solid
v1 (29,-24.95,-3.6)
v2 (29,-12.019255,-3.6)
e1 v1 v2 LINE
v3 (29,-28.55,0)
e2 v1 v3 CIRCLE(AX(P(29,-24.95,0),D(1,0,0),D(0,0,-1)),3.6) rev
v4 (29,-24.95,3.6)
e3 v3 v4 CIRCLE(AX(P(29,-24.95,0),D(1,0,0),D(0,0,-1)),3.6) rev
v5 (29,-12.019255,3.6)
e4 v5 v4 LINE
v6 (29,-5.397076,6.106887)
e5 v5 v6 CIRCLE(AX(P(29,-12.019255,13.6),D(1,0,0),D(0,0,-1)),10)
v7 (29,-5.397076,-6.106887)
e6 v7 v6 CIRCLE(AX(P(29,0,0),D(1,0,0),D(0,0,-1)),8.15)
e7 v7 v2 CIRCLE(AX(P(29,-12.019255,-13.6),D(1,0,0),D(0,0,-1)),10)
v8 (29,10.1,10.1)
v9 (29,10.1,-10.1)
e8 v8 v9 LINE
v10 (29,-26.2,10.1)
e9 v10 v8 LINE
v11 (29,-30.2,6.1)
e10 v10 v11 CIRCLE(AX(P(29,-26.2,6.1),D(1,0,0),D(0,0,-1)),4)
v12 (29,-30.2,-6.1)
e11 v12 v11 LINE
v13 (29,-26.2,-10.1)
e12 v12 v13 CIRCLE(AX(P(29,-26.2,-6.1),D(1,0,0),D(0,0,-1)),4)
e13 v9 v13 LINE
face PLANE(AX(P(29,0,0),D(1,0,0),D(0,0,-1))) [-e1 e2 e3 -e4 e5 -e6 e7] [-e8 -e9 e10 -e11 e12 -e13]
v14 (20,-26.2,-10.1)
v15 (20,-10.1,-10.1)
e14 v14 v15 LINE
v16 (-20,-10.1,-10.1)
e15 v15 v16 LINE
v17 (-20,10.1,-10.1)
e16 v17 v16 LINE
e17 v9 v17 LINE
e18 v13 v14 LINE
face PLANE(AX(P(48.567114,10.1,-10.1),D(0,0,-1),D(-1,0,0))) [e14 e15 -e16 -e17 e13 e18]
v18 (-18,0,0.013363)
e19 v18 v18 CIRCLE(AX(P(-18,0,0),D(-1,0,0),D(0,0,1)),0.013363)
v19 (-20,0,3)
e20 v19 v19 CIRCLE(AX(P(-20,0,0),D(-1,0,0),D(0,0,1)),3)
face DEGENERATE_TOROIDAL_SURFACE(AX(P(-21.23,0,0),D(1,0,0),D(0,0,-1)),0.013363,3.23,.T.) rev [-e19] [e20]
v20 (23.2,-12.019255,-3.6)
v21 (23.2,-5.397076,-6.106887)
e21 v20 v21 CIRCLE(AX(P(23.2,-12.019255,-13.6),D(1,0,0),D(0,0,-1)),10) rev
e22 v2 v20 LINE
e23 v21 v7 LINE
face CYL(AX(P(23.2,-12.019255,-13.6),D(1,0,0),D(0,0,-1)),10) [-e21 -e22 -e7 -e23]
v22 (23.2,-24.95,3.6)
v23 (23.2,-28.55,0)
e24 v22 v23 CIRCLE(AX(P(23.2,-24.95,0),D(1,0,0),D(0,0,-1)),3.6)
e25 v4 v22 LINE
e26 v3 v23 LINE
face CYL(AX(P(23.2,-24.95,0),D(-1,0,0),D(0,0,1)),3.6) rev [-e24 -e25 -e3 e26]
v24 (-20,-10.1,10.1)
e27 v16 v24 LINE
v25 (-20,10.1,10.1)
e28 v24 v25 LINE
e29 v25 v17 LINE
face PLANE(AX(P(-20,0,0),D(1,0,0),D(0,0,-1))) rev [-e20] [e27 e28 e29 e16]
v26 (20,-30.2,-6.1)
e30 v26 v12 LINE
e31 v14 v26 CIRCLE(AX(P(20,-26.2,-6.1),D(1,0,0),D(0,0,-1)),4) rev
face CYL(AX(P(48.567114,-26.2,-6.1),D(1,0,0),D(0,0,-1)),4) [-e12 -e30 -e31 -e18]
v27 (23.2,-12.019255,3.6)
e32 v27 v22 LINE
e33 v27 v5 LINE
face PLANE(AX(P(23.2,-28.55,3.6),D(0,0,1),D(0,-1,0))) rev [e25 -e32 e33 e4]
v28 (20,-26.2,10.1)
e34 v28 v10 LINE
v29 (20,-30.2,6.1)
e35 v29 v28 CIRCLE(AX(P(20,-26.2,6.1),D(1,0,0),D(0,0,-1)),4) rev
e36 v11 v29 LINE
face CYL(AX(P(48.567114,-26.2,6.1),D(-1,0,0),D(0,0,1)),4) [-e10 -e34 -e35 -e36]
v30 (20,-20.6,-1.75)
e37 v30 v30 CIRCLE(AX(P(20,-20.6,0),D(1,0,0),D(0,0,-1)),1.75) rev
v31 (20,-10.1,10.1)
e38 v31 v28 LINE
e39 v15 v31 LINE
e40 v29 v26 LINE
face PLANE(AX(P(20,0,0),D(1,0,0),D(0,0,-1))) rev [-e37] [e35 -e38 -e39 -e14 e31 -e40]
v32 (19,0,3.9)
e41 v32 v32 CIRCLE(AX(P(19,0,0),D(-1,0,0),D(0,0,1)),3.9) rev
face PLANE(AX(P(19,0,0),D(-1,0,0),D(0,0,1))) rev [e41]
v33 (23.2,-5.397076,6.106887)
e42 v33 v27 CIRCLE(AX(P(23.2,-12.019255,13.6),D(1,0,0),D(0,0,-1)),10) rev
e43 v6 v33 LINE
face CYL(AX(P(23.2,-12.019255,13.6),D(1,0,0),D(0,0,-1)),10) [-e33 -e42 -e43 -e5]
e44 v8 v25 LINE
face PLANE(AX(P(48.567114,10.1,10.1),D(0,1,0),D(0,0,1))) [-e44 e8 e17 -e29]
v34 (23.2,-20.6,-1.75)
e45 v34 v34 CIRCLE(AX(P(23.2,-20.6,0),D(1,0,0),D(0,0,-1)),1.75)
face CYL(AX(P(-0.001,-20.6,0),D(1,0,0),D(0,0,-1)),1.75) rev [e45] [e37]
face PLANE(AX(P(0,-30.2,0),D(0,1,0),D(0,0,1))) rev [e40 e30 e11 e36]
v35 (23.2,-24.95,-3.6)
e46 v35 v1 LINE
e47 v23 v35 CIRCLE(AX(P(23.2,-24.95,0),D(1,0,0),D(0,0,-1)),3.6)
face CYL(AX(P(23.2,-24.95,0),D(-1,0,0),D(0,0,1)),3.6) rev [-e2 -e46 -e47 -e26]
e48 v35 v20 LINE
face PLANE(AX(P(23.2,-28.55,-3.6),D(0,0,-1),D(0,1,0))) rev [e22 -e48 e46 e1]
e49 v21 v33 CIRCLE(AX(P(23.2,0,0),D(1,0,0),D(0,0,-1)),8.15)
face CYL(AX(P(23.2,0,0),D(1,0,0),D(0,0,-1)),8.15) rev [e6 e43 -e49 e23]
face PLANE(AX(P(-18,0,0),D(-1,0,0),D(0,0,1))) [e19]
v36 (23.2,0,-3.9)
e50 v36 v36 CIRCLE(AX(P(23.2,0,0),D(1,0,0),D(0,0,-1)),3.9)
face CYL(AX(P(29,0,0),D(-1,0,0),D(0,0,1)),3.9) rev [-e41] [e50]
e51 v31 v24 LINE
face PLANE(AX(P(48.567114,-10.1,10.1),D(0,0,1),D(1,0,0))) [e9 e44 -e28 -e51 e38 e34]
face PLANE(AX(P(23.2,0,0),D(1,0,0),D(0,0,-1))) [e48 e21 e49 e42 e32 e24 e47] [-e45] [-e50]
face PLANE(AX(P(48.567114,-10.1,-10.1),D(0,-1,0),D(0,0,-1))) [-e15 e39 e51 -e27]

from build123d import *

# Parameters (mm, degrees)
SKETCH1_W           = 20
SKETCH1_H           = 20
BOSS_EXTRUDE1_DEPTH = 20
SKETCH2_W           = 45
SKETCH2_H           = 70
BOSS_EXTRUDE2_DEPTH = 9
CUT_EXTRUDE1_DEPTH  = 5.8
FILLET1_R           = 3.6
FILLET2_R           = 10
SKETCH5_R           = 3.9
CUT_EXTRUDE2_DEPTH  = 51.717354032
CUT_EXTRUDE3_REACH  = 49.639
SKETCH6_R           = 1.75
SKETCH7_W           = 9
SKETCH7_H           = 45
CUT_EXTRUDE4_DEPTH  = 4.8
SKETCH9_W           = 9
SKETCH9_H           = 45
CUT_EXTRUDE5_DEPTH  = 23.8
SKETCH10_W          = 12.5
SKETCH10_H          = 41.4
CUT_EXTRUDE6_DEPTH  = 23.8
SKETCH11_W          = 20
SKETCH11_H          = 1.2
CUT_EXTRUDE7_DEPTH  = 23.8
BOSS_EXTRUDE3_START = 20
SKETCH12_W          = 20
SKETCH12_H          = 20
SKETCH12_R          = 3.9
BOSS_EXTRUDE3_DEPTH = 20
SKETCH13_W          = 20.2
SKETCH13_H          = 20.2
SKETCH13_R          = 3.9
BOSS_EXTRUDE4_DEPTH = 40
SKETCH14_W          = 9
SKETCH14_H          = 20
BOSS_EXTRUDE5_DEPTH = 0.1
SKETCH15_W          = 9
SKETCH15_H          = 40.3
BOSS_EXTRUDE6_DEPTH = 0.1
SKETCH16_W          = 9
SKETCH16_H          = 40.3
BOSS_EXTRUDE7_DEPTH = 0.1
SKETCH17_R          = 4.83091966
BOSS_EXTRUDE8_DEPTH = 39
SKETCH18_R          = 3
CUT_EXTRUDE8_DEPTH  = 2
FILLET3_R           = 3.23
FILLET4_R           = 4


# Some blends are built 0.0001 mm under size
with BuildPart() as part:
    # Sketch1 → Boss-Extrude1 (new body)
    with BuildSketch(Plane(origin=(0, 0, 0), x_dir=(0, 0, -1), z_dir=(1, 0, 0))):
        Rectangle(SKETCH1_W, SKETCH1_H)
    extrude(amount=BOSS_EXTRUDE1_DEPTH)

    # Sketch2 → Boss-Extrude2 (add)
    with BuildSketch(Plane(origin=(20, 0, 0), x_dir=(0, 0, -1), z_dir=(1, 0, 0))):
        Rectangle(SKETCH2_W, SKETCH2_H)
    extrude(amount=BOSS_EXTRUDE2_DEPTH)

    # Sketch4 → Cut-Extrude1 (cut)
    with BuildSketch(Plane(origin=(29, 0, 0), x_dir=(0, 0, -1), z_dir=(1, 0, 0))):
        with BuildLine():
            Line((3.6, -28.55), (-3.6, -28.55))
            Line((-3.6, -28.55), (-3.6, -7.311805523))
            ThreePointArc((-3.6, -7.311805523), (0, 8.15), (3.6, -7.311805523))
            Line((3.6, -7.311805523), (3.6, -28.55))
        make_face()
    extrude(amount=-CUT_EXTRUDE1_DEPTH, mode=Mode.SUBTRACT)

    # Fillet1
    fillet1_edges = [part.edges().sort_by_distance(p)[0] for p in [
        (26.1, -28.55, 3.6),
        (26.1, -28.55, -3.6),
    ]]
    fillet(fillet1_edges, radius=FILLET1_R - 0.0001)  # a hair under: the kernel refuses the full size

    # Fillet2
    fillet2_edges = [part.edges().sort_by_distance(p)[0] for p in [
        (26.1, -7.311805523, 3.6),
        (26.1, -7.311805523, -3.6),
    ]]
    fillet(fillet2_edges, radius=FILLET2_R)

    # Sketch5 → Cut-Extrude2 (cut, through all)
    with BuildSketch(Plane.ZY):
        Circle(SKETCH5_R)
    extrude(amount=-CUT_EXTRUDE2_DEPTH, mode=Mode.SUBTRACT)

    # Sketch6 → Cut-Extrude3 (cut, up to next)
    with BuildSketch(Plane(origin=(23.2, 0, 0), x_dir=(0, 0, -1), z_dir=(1, 0, 0)), mode=Mode.PRIVATE) as cut_extrude3_sk1:
        with Locations((0, -20.6)):
            Circle(SKETCH6_R)
    cut_extrude3_tool1 = extrude(cut_extrude3_sk1.sketch, amount=-CUT_EXTRUDE3_REACH, mode=Mode.PRIVATE) & part.part
    add(cut_extrude3_tool1.solids().sort_by_distance((23.2, -20.6, 0))[0], mode=Mode.SUBTRACT)

    # Sketch7 → Cut-Extrude4 (cut)
    with BuildSketch(Plane.XZ.offset(35)):
        with Locations((24.5, 0)):
            Rectangle(SKETCH7_W, SKETCH7_H)
    extrude(amount=-CUT_EXTRUDE4_DEPTH, mode=Mode.SUBTRACT)

    # Sketch9 → Cut-Extrude5 (cut)
    with BuildSketch(Plane(origin=(0, 35, 0), x_dir=(1, 0, 0), z_dir=(0, 1, 0))):
        with Locations((24.5, 0)):
            Rectangle(SKETCH9_W, SKETCH9_H)
    extrude(amount=-CUT_EXTRUDE5_DEPTH, mode=Mode.SUBTRACT)

    # Sketch10 → Cut-Extrude6 (cut)
    with BuildSketch(Plane.ZY.offset(-20)):
        with Locations((-16.25, -9.5)):
            Rectangle(SKETCH10_W, SKETCH10_H)
        with Locations((16.25, -9.5)):
            Rectangle(SKETCH10_W, SKETCH10_H)
    extrude(amount=-CUT_EXTRUDE6_DEPTH, mode=Mode.SUBTRACT)

    # Sketch11 → Cut-Extrude7 (cut)
    with BuildSketch(Plane.ZY.offset(-20)):
        with Locations((0, 10.6)):
            Rectangle(SKETCH11_W, SKETCH11_H)
    extrude(amount=-CUT_EXTRUDE7_DEPTH, mode=Mode.SUBTRACT)

    # Sketch12 → Boss-Extrude3 (add)
    with BuildSketch(Plane.ZY.offset(BOSS_EXTRUDE3_START)):
        Rectangle(SKETCH12_W, SKETCH12_H)
        Circle(SKETCH12_R, mode=Mode.SUBTRACT)
    extrude(amount=-BOSS_EXTRUDE3_DEPTH)

    # Sketch13 → Boss-Extrude4 (add)
    with BuildSketch(Plane.ZY.offset(20)):
        Rectangle(SKETCH13_W, SKETCH13_H)
        Circle(SKETCH13_R, mode=Mode.SUBTRACT)
    extrude(amount=-BOSS_EXTRUDE4_DEPTH)

    # Sketch14 → Boss-Extrude5 (add)
    with BuildSketch(Plane(origin=(0, 10, 0), x_dir=(1, 0, 0), z_dir=(0, 1, 0))):
        with Locations((24.5, 0)):
            Rectangle(SKETCH14_W, SKETCH14_H)
    extrude(amount=BOSS_EXTRUDE5_DEPTH)

    # Sketch15 → Boss-Extrude6 (add)
    with BuildSketch(Plane.XY.offset(10)):
        with Locations((24.5, -10.05)):
            Rectangle(SKETCH15_W, SKETCH15_H)
    extrude(amount=BOSS_EXTRUDE6_DEPTH)

    # Sketch16 → Boss-Extrude7 (add)
    with BuildSketch(Plane(origin=(0, 0, -10), x_dir=(-1, 0, 0), z_dir=(0, 0, -1))):
        with Locations((-24.5, -10.05)):
            Rectangle(SKETCH16_W, SKETCH16_H)
    extrude(amount=BOSS_EXTRUDE7_DEPTH)

    # Sketch17 → Boss-Extrude8 (add)
    with BuildSketch(Plane.ZY.offset(20)):
        Circle(SKETCH17_R)
    extrude(amount=-BOSS_EXTRUDE8_DEPTH)

    # Sketch18 → Cut-Extrude8 (cut)
    with BuildSketch(Plane.ZY.offset(20)):
        Circle(SKETCH18_R)
    extrude(amount=-CUT_EXTRUDE8_DEPTH, mode=Mode.SUBTRACT)

    # Fillet3
    # the kernel refuses this fillet: 3.23 mm, written as the material it adds along each edge
    with BuildSketch(Plane(origin=(-18, 0, 0), x_dir=(0, 0, 1), z_dir=(0, -1, 0))) as fillet3_piece_1:
        with BuildLine():
            CenterArc((0.013363095, 3.23), FILLET3_R, 270, 67.616447755)
            Line((0.013363095, 0), (0.013363095, -0.0646))
            Line((0.013363095, -0.0646), (3, -0.0646))
            Line((3, -0.0646), (3.0646, 0))
            ThreePointArc((3.0646, 0), (3.0646, 1), (3.059732738, 1.9754))
            Line((3.059732738, 1.9754), (3, 2))
        make_face()
    revolve(axis=Axis((-18, 0, 0), (-1, 0, 0)))

    # Fillet4
    fillet4_edges = [part.edges().sort_by_distance(p)[0] for p in [
        (24.5, -30.2, 10.1),
        (24.5, -30.2, -10.1),
    ]]
    fillet(fillet4_edges, radius=FILLET4_R)


solid = part.part
